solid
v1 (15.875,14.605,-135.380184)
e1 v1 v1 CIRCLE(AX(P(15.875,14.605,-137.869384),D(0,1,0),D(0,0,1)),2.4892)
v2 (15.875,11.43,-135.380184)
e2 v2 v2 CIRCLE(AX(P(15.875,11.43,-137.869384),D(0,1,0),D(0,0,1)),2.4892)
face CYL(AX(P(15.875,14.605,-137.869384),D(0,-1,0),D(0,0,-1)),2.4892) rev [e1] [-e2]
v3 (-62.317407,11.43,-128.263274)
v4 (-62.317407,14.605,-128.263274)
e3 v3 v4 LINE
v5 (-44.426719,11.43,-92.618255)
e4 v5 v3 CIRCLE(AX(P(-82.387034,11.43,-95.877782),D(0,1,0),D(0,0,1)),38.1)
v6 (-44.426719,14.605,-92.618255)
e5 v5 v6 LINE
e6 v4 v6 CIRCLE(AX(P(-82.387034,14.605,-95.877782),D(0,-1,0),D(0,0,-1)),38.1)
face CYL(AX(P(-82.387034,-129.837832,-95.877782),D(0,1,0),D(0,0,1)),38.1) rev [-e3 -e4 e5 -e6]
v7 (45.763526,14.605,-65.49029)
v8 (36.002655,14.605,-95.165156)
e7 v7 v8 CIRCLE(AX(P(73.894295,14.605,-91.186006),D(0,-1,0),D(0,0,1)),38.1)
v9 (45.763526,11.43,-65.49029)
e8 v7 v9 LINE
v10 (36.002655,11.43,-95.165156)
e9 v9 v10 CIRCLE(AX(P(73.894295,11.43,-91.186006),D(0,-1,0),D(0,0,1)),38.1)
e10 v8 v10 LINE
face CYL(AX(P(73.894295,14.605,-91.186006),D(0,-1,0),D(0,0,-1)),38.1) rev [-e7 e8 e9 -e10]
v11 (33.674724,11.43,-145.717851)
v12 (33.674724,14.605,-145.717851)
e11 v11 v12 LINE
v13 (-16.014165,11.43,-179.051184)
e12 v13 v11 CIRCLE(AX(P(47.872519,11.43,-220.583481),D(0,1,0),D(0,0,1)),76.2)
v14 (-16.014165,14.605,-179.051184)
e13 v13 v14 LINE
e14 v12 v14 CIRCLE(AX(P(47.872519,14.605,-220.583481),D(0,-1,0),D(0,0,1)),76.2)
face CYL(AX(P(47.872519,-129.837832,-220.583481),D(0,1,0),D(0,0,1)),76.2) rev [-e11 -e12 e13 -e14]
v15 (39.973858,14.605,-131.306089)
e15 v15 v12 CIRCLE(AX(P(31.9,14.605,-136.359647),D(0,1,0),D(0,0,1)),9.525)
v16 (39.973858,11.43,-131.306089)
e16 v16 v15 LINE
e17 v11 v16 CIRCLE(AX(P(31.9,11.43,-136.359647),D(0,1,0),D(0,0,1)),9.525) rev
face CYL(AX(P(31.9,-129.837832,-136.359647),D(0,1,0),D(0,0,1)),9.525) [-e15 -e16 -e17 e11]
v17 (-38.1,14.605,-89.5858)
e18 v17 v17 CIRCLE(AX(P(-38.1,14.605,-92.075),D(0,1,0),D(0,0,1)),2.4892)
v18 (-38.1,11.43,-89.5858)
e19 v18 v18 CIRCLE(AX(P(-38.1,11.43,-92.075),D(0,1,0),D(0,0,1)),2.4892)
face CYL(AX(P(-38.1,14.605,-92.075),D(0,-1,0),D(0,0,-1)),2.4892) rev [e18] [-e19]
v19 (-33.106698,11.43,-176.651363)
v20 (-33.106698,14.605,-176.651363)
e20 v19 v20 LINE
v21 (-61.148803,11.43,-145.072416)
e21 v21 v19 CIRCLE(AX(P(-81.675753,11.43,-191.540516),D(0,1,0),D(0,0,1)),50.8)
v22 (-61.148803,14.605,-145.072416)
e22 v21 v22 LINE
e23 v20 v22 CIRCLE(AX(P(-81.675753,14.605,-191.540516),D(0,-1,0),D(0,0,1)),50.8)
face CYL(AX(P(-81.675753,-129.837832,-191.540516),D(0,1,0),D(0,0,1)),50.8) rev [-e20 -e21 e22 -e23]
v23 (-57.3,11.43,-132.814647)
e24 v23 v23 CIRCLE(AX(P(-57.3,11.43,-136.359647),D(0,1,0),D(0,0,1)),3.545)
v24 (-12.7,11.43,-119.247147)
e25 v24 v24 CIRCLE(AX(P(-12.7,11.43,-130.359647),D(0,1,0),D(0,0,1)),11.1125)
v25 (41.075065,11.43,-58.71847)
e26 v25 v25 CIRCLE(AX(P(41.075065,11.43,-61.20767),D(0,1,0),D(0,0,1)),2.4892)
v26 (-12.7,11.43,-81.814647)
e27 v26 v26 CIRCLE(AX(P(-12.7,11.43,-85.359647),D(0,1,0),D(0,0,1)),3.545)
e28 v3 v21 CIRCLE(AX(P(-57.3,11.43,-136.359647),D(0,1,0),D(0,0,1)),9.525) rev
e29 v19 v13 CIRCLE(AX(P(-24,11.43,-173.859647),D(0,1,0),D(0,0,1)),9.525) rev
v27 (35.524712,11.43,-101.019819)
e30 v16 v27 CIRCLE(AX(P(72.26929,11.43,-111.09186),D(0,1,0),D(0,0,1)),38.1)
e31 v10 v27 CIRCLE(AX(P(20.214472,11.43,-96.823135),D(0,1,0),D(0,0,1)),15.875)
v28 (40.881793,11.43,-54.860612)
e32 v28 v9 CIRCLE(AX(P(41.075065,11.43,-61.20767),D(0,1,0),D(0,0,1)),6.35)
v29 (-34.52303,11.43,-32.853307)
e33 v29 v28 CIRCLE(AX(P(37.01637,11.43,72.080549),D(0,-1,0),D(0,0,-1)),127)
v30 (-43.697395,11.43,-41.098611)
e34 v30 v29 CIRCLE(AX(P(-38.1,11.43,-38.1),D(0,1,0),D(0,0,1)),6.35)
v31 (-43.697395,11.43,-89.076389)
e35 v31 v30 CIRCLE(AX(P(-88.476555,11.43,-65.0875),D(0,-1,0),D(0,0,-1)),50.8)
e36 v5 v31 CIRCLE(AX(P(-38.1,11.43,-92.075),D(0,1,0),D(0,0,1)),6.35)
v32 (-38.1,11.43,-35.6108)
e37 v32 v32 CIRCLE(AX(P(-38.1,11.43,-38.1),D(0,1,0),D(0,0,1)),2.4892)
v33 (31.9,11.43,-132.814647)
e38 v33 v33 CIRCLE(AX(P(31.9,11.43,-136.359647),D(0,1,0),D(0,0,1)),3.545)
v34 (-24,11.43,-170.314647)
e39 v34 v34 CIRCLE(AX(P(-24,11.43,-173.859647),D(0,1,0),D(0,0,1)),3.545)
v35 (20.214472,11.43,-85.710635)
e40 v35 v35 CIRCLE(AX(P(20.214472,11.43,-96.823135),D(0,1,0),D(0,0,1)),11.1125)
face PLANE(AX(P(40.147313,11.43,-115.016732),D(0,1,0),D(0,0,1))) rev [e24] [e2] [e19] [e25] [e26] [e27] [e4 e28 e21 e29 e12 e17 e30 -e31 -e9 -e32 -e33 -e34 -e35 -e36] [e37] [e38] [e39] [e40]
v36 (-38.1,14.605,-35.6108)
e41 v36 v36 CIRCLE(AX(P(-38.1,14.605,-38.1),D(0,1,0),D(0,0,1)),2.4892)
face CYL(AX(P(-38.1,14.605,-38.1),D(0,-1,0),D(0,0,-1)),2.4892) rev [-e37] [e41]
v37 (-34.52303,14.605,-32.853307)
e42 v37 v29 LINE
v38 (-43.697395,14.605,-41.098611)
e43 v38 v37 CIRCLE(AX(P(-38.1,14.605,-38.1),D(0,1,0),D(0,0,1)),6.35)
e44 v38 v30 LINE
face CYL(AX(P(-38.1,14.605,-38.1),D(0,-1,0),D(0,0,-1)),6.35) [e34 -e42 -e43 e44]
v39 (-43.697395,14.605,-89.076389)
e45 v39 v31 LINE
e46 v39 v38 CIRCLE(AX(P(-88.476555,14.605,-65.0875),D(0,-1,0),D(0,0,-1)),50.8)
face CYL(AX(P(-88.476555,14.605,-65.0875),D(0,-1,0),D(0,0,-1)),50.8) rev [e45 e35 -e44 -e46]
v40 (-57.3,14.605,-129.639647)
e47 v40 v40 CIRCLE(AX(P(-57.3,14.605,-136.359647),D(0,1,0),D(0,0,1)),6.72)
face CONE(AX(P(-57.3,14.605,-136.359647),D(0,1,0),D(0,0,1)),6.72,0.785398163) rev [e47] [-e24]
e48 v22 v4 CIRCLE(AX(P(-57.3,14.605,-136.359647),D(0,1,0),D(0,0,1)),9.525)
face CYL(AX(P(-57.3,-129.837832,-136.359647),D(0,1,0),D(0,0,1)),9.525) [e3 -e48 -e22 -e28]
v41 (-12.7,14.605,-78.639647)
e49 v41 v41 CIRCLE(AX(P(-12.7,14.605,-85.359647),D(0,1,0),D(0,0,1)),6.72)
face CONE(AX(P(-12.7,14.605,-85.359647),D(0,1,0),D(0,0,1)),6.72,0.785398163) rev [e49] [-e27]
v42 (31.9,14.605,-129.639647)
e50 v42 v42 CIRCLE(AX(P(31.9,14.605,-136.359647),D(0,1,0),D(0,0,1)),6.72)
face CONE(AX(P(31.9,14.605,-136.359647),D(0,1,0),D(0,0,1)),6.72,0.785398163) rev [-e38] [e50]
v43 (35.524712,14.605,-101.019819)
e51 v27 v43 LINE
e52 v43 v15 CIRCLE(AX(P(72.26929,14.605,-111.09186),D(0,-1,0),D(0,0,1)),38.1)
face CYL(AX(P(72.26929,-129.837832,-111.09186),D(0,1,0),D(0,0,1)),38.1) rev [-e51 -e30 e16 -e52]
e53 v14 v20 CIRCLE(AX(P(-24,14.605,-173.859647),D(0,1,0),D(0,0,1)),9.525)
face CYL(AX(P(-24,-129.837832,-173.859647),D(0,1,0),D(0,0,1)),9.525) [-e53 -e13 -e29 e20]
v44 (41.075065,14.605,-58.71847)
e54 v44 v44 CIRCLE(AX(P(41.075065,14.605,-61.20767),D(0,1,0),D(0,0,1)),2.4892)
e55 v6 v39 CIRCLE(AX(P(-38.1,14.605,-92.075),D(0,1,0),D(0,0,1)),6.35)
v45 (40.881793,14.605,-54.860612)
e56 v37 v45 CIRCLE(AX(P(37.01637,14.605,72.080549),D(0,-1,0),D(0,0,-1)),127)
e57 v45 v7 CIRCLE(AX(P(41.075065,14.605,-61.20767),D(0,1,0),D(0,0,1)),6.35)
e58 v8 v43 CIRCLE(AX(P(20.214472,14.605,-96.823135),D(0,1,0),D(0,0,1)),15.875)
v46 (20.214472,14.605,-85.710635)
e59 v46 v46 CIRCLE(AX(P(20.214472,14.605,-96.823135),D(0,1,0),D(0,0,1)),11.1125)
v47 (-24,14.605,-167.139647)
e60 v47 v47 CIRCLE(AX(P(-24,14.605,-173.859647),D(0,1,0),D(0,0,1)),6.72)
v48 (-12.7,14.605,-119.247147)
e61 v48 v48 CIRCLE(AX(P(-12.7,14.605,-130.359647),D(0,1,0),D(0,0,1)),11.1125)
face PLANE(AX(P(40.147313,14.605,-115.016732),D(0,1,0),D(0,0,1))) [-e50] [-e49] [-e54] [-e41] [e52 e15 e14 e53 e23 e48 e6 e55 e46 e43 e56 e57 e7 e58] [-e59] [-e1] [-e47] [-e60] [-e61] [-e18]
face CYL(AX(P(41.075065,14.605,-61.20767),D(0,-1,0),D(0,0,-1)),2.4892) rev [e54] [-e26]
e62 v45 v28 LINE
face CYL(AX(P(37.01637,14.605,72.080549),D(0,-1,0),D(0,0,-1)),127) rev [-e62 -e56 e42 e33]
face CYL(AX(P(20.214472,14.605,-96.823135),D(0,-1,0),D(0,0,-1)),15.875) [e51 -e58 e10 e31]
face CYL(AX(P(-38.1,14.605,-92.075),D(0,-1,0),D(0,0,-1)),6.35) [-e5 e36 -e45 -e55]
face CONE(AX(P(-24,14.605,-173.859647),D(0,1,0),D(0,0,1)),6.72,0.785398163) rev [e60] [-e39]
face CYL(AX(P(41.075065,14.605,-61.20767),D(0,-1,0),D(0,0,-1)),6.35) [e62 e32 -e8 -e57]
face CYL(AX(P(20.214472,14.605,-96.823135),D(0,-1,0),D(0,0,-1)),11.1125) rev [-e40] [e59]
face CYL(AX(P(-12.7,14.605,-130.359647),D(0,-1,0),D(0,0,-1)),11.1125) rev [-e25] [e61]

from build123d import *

# Parameters (mm, degrees)
LOWEREDBALLAST_DECK_MOUNT_START       = 6.35
LOWEREDBALLAST_DECK_MOUNT_OUTLINE_R   = 2.5527
LOWEREDBALLAST_DECK_MOUNT_OUTLINE_R_2 = 2.4892
LOWEREDBALLAST_DECK_MOUNT_OUTLINE_R_3 = 8.73125
LOWEREDBALLAST_DECK_MOUNT_DEPTH       = 5.08
BODY_MOVE_COPY2_START                 = 11.43
BODY_MOVE_COPY2_OUTLINE_W             = 5.08
BODY_MOVE_COPY2_OUTLINE_H             = 241.3
BODY_MOVE_COPY2_DEPTH                 = 185.42
BODY_MOVE_COPY2_START_2               = 6.35
BODY_MOVE_COPY2_2_OUTLINE_W           = 5.08
BODY_MOVE_COPY2_2_OUTLINE_H           = 127
BODY_MOVE_COPY2_2_DEPTH               = 5.08
BODY_MOVE_COPY2_3_OUTLINE_R           = 2.5527
BODY_MOVE_COPY2_3_OUTLINE_R_2         = 2.4892
BODY_MOVE_COPY2_3_OUTLINE_R_3         = 8.73125
BODY_MOVE_COPY2_3_DEPTH               = 5.08
SKETCH2_R                             = 2.4892
SKETCH2_R_2                           = 11.1125
BOSS_EXTRUDE2_DEPTH                   = 3.175
BOSS_EXTRUDE3_DEPTH                   = 3.175
CSK_FOR_M6_SFHCS1_AT_2_COUNT          = 2
CSK_FOR_M6_SFHCS1_AT_2_PITCH          = 50.151171472
CSK_FOR_M6_SFHCS1_AT_3_COUNT          = 2
CSK_FOR_M6_SFHCS1_AT_3_PITCH          = 89.2
CSK_FOR_M6_SFHCS1_AT_4_COUNT          = 2
CSK_FOR_M6_SFHCS1_AT_4_PITCH          = 67.750719553


# Read off the part's stored shape, not the designer's step: LoweredBallast_Deck_Mount, Body-Move/Copy2
with BuildPart() as part:
    # LoweredBallast_Deck_Mount outline → LoweredBallast_Deck_Mount (new body)
    with BuildSketch(Plane.YZ.offset(LOWEREDBALLAST_DECK_MOUNT_START)):
        Polygon((6.35, -120.65), (107.712348179, -120.65), (196.85, -56.884227826), (196.85, 56.884227826), (107.712348179, 120.65), (6.35, 120.65), align=None)
        with Locations((15.875, -111.125)):
            Circle(LOWEREDBALLAST_DECK_MOUNT_OUTLINE_R, mode=Mode.SUBTRACT)
        with Locations((49.2125, -13.748153285)):
            Circle(LOWEREDBALLAST_DECK_MOUNT_OUTLINE_R, mode=Mode.SUBTRACT)
        with Locations((61.207670487, -41.07506464)):
            Circle(LOWEREDBALLAST_DECK_MOUNT_OUTLINE_R_2, mode=Mode.SUBTRACT)
        with Locations((96.823134697, -20.21447179)):
            Circle(LOWEREDBALLAST_DECK_MOUNT_OUTLINE_R_3, mode=Mode.SUBTRACT)
        with Locations((104.656174089, -111.125)):
            Circle(LOWEREDBALLAST_DECK_MOUNT_OUTLINE_R, mode=Mode.SUBTRACT)
        with Locations((137.869384338, -15.875)):
            Circle(LOWEREDBALLAST_DECK_MOUNT_OUTLINE_R_2, mode=Mode.SUBTRACT)
        with Locations((187.325, -51.986786112)):
            Circle(LOWEREDBALLAST_DECK_MOUNT_OUTLINE_R, mode=Mode.SUBTRACT)
        with Locations((15.875, 0)):
            Circle(LOWEREDBALLAST_DECK_MOUNT_OUTLINE_R, mode=Mode.SUBTRACT)
        with Locations((49.2125, 13.748153285)):
            Circle(LOWEREDBALLAST_DECK_MOUNT_OUTLINE_R, mode=Mode.SUBTRACT)
        with Locations((38.1, 38.1)):
            Circle(LOWEREDBALLAST_DECK_MOUNT_OUTLINE_R_2, mode=Mode.SUBTRACT)
        with Locations((57.15, 0)):
            Circle(LOWEREDBALLAST_DECK_MOUNT_OUTLINE_R_3, mode=Mode.SUBTRACT)
        with Locations((73.025, 0)):
            Circle(LOWEREDBALLAST_DECK_MOUNT_OUTLINE_R, mode=Mode.SUBTRACT)
        with Locations((92.075, 38.1)):
            Circle(LOWEREDBALLAST_DECK_MOUNT_OUTLINE_R_2, mode=Mode.SUBTRACT)
        with Locations((15.875, 111.125)):
            Circle(LOWEREDBALLAST_DECK_MOUNT_OUTLINE_R, mode=Mode.SUBTRACT)
        with Locations((187.325, 51.986786112)):
            Circle(LOWEREDBALLAST_DECK_MOUNT_OUTLINE_R, mode=Mode.SUBTRACT)
        with Locations((104.656174089, 111.125)):
            Circle(LOWEREDBALLAST_DECK_MOUNT_OUTLINE_R, mode=Mode.SUBTRACT)
    extrude(amount=LOWEREDBALLAST_DECK_MOUNT_DEPTH)

    # Body-Move/Copy2 outline → Body-Move/Copy2 (cut)
    with BuildSketch(Plane(origin=(0, 0, 0), x_dir=(1, 0, 0), z_dir=(0, 1, 0)).offset(BODY_MOVE_COPY2_START)):
        with Locations((8.89, 0)):
            Rectangle(BODY_MOVE_COPY2_OUTLINE_W, BODY_MOVE_COPY2_OUTLINE_H)
    extrude(amount=BODY_MOVE_COPY2_DEPTH, mode=Mode.SUBTRACT)

    # Body-Move_Copy2 2 outline → Body-Move_Copy2 2 (cut)
    with BuildSketch(Plane(origin=(0, 0, 0), x_dir=(1, 0, 0), z_dir=(0, 1, 0)).offset(BODY_MOVE_COPY2_START_2)):
        with Locations((8.89, -57.15)):
            Rectangle(BODY_MOVE_COPY2_2_OUTLINE_W, BODY_MOVE_COPY2_2_OUTLINE_H)
        with BuildLine():
            ThreePointArc((11.43, 50.281351083), (11.195453285, 49.2125), (11.43, 48.143648917))
            Line((11.43, 48.143648917), (11.43, 50.281351083))
        make_face()
        with BuildLine():
            Line((6.35, 63.142681083), (6.35, 51.157318917))
            ThreePointArc((6.35, 51.157318917), (8.73125, 57.15), (6.35, 63.142681083))
        make_face()
    extrude(amount=BODY_MOVE_COPY2_2_DEPTH, mode=Mode.SUBTRACT)

    # Body-Move_Copy2 3 outline → Body-Move_Copy2 3 (add)
    with BuildSketch(Plane(origin=(0, 0, 0), x_dir=(1, 0, 0), z_dir=(0, 1, 0)).offset(BODY_MOVE_COPY2_START_2)):
        with BuildLine():
            Line((120.65, 6.35), (120.65, 107.712348179))
            Line((120.65, 107.712348179), (56.884227826, 196.85))
            Line((56.884227826, 196.85), (-56.884227826, 196.85))
            Line((-56.884227826, 196.85), (-120.65, 107.712348179))
            Line((-120.65, 107.712348179), (-120.65, 6.35))
            Line((-120.65, 6.35), (6.35, 6.35))
            Line((6.35, 6.35), (6.35, 51.157318917))
            ThreePointArc((6.35, 51.157318917), (-8.73125, 57.15), (6.35, 63.142681083))
            Line((6.35, 63.142681083), (6.35, 120.65))
            Line((6.35, 120.65), (11.43, 120.65))
            Line((11.43, 120.65), (11.43, 50.281351083))
            ThreePointArc((11.43, 50.281351083), (16.300853285, 49.2125), (11.43, 48.143648917))
            Line((11.43, 48.143648917), (11.43, 6.35))
            Line((11.43, 6.35), (120.65, 6.35))
        make_face()
        with Locations((-111.125, 15.875)):
            Circle(BODY_MOVE_COPY2_3_OUTLINE_R, mode=Mode.SUBTRACT)
        with Locations((0, 15.875)):
            Circle(BODY_MOVE_COPY2_3_OUTLINE_R, mode=Mode.SUBTRACT)
        with Locations((111.125, 15.875)):
            Circle(BODY_MOVE_COPY2_3_OUTLINE_R, mode=Mode.SUBTRACT)
        with Locations((-111.125, 104.656174089)):
            Circle(BODY_MOVE_COPY2_3_OUTLINE_R, mode=Mode.SUBTRACT)
        with Locations((-38.1, 38.1)):
            Circle(BODY_MOVE_COPY2_3_OUTLINE_R_2, mode=Mode.SUBTRACT)
        with Locations((-13.748153285, 49.2125)):
            Circle(BODY_MOVE_COPY2_3_OUTLINE_R, mode=Mode.SUBTRACT)
        with Locations((-38.1, 92.075)):
            Circle(BODY_MOVE_COPY2_3_OUTLINE_R_2, mode=Mode.SUBTRACT)
        with Locations((-51.986786112, 187.325)):
            Circle(BODY_MOVE_COPY2_3_OUTLINE_R, mode=Mode.SUBTRACT)
        with Locations((0, 73.025)):
            Circle(BODY_MOVE_COPY2_3_OUTLINE_R, mode=Mode.SUBTRACT)
        with Locations((41.07506464, 61.207670487)):
            Circle(BODY_MOVE_COPY2_3_OUTLINE_R_2, mode=Mode.SUBTRACT)
        with Locations((20.21447179, 96.823134697)):
            Circle(BODY_MOVE_COPY2_3_OUTLINE_R_3, mode=Mode.SUBTRACT)
        with Locations((111.125, 104.656174089)):
            Circle(BODY_MOVE_COPY2_3_OUTLINE_R, mode=Mode.SUBTRACT)
        with Locations((15.875, 137.869384338)):
            Circle(BODY_MOVE_COPY2_3_OUTLINE_R_2, mode=Mode.SUBTRACT)
        with Locations((51.986786112, 187.325)):
            Circle(BODY_MOVE_COPY2_3_OUTLINE_R, mode=Mode.SUBTRACT)
    extrude(amount=BODY_MOVE_COPY2_3_DEPTH)


with BuildPart() as body_2:
    # Sketch2 → Boss-Extrude2 (new body)
    with BuildSketch(Plane(origin=(0, 11.43, 0), x_dir=(1, 0, 0), z_dir=(0, 1, 0))):
        with BuildLine():
            ThreePointArc((-43.697395055, 41.098611111), (-42.344618776, 33.377107725), (-34.523029987, 32.853307182))
            ThreePointArc((-34.523029987, 32.853307182), (1.435165075, 49.833263975), (40.88179348, 54.860612408))
            ThreePointArc((40.88179348, 54.860612408), (46.845610099, 58.557518585), (45.763526107, 65.490289905))
            ThreePointArc((45.763526107, 65.490289905), (37.701905828, 79.281344599), (36.002655059, 95.16515579))
            ThreePointArc((36.002655059, 95.16515579), (35.295571353, 101.780559529), (31.939672665, 107.525250816))
            ThreePointArc((31.939672665, 107.525250816), (23.883267234, 121.31935255), (22.19002211, 137.203805076))
            ThreePointArc((22.19002211, 137.203805076), (20.070189732, 142.636236875), (14.412445618, 144.048658946))
            ThreePointArc((14.412445618, 144.048658946), (3.462344959, 143.086426048), (-7.306729609, 145.290429122))
            ThreePointArc((-7.306729609, 145.290429122), (-22.309274144, 142.996002148), (-28.529000968, 129.152023822))
            ThreePointArc((-28.529000968, 129.152023822), (-31.43370737, 111.399097034), (-42.15980047, 96.957675511))
            ThreePointArc((-42.15980047, 96.957675511), (-44.332497578, 93.290925139), (-43.697395055, 89.076388889))
            ThreePointArc((-43.697395055, 89.076388889), (-37.676555497, 65.0875), (-43.697395055, 41.098611111))
        make_face()
        with Locations(Location((-38.1, 92.075, 0), (0, 0, 270))):
            Circle(SKETCH2_R, mode=Mode.SUBTRACT)
        with Locations(Location((15.875, 137.869384338, 0), (0, 0, 270))):
            Circle(SKETCH2_R, mode=Mode.SUBTRACT)
        with Locations(Location((41.07506464, 61.207670487, 0), (0, 0, 270))):
            Circle(SKETCH2_R, mode=Mode.SUBTRACT)
        with Locations(Location((20.21447179, 96.823134697, 0), (0, 0, 270))):
            Circle(SKETCH2_R_2, mode=Mode.SUBTRACT)
        with Locations(Location((-12.7, 130.359646842, 0), (0, 0, 270))):
            Circle(SKETCH2_R_2, mode=Mode.SUBTRACT)
        with Locations(Location((-38.1, 38.1, 0), (0, 0, 270))):
            Circle(SKETCH2_R, mode=Mode.SUBTRACT)
    extrude(amount=BOSS_EXTRUDE2_DEPTH)

    # Sketch5 → Boss-Extrude3 (add)
    with BuildSketch(Plane(origin=(0, 14.605, 0), x_dir=(1, 0, 0), z_dir=(0, 1, 0))):
        with BuildLine():
            ThreePointArc((-61.148803131, 145.072415601), (-66.802064537, 137.020248494), (-62.317406726, 128.263273904))
            ThreePointArc((-62.317406726, 128.263273904), (-48.335449579, 112.968704409), (-44.42671909, 92.618254593))
            ThreePointArc((-44.42671909, 92.618254593), (-43.728284874, 95.015222675), (-42.15980047, 96.957675511))
            ThreePointArc((-42.15980047, 96.957675511), (-31.43370737, 111.399097034), (-28.529000968, 129.152023822))
            ThreePointArc((-28.529000968, 129.152023822), (-22.309274144, 142.996002148), (-7.306729609, 145.290429122))
            ThreePointArc((-7.306729609, 145.290429122), (3.462344959, 143.086426048), (14.412445618, 144.048658946))
            ThreePointArc((14.412445618, 144.048658946), (20.070189732, 142.636236875), (22.19002211, 137.203805076))
            ThreePointArc((22.19002211, 137.203805076), (23.883267234, 121.31935255), (31.939672665, 107.525250816))
            ThreePointArc((31.939672665, 107.525250816), (34.118030208, 104.485163692), (35.524712446, 101.019818631))
            ThreePointArc((35.524712446, 101.019818631), (34.573862159, 116.629433393), (39.973858004, 131.306089488))
            ThreePointArc((39.973858004, 131.306089488), (40.627735004, 140.174390174), (33.674724287, 145.71785066))
            ThreePointArc((33.674724287, 145.71785066), (5.421674261, 157.303422607), (-16.014164602, 179.051183993))
            ThreePointArc((-16.014164602, 179.051183993), (-25.324336968, 183.292130958), (-33.106697868, 176.65136297))
            ThreePointArc((-33.106697868, 176.65136297), (-43.690598599, 157.809698398), (-61.148803131, 145.072415601))
        make_face()
    extrude(amount=-BOSS_EXTRUDE3_DEPTH)

    # Sketch7 → CSK for M6 SFHCS1 (revolve, cut)
    with BuildSketch(Plane(origin=(-57.3, 14.605, -136.359646842), x_dir=(0, 0, 1), z_dir=(1, 0, 0))):
        Polygon((0, 0), (0, 3.175), (3.3, 3.175), (3.3, 3.42), (6.72, 0), align=None)
    csk_for_m6_sfhcs1 = revolve(axis=Axis((-57.3, 20.955, -136.359646842), (0, -1, 0)), mode=Mode.SUBTRACT)

    # CSK for M6 SFHCS1 at 2: CSK for M6 SFHCS1 ×2
    with Locations(*[Vector(0.663992465633312, -2.603373438029753e-15, -0.7477392631005777) * (i * CSK_FOR_M6_SFHCS1_AT_2_PITCH) for i in range(1, CSK_FOR_M6_SFHCS1_AT_2_COUNT)]):
        add(csk_for_m6_sfhcs1, mode=Mode.SUBTRACT)

    # CSK for M6 SFHCS1 at 3: CSK for M6 SFHCS1 ×2
    with Locations(*[(i * CSK_FOR_M6_SFHCS1_AT_3_PITCH, 0, 0) for i in range(1, CSK_FOR_M6_SFHCS1_AT_3_COUNT)]):
        add(csk_for_m6_sfhcs1, mode=Mode.SUBTRACT)

    # CSK for M6 SFHCS1 at 4: CSK for M6 SFHCS1 ×2
    with Locations(*[Vector(0.6582955914566169, 2.6219010677824987e-15, 0.7527595328315564) * (i * CSK_FOR_M6_SFHCS1_AT_4_PITCH) for i in range(1, CSK_FOR_M6_SFHCS1_AT_4_COUNT)]):
        add(csk_for_m6_sfhcs1, mode=Mode.SUBTRACT)


solid = body_2.part
